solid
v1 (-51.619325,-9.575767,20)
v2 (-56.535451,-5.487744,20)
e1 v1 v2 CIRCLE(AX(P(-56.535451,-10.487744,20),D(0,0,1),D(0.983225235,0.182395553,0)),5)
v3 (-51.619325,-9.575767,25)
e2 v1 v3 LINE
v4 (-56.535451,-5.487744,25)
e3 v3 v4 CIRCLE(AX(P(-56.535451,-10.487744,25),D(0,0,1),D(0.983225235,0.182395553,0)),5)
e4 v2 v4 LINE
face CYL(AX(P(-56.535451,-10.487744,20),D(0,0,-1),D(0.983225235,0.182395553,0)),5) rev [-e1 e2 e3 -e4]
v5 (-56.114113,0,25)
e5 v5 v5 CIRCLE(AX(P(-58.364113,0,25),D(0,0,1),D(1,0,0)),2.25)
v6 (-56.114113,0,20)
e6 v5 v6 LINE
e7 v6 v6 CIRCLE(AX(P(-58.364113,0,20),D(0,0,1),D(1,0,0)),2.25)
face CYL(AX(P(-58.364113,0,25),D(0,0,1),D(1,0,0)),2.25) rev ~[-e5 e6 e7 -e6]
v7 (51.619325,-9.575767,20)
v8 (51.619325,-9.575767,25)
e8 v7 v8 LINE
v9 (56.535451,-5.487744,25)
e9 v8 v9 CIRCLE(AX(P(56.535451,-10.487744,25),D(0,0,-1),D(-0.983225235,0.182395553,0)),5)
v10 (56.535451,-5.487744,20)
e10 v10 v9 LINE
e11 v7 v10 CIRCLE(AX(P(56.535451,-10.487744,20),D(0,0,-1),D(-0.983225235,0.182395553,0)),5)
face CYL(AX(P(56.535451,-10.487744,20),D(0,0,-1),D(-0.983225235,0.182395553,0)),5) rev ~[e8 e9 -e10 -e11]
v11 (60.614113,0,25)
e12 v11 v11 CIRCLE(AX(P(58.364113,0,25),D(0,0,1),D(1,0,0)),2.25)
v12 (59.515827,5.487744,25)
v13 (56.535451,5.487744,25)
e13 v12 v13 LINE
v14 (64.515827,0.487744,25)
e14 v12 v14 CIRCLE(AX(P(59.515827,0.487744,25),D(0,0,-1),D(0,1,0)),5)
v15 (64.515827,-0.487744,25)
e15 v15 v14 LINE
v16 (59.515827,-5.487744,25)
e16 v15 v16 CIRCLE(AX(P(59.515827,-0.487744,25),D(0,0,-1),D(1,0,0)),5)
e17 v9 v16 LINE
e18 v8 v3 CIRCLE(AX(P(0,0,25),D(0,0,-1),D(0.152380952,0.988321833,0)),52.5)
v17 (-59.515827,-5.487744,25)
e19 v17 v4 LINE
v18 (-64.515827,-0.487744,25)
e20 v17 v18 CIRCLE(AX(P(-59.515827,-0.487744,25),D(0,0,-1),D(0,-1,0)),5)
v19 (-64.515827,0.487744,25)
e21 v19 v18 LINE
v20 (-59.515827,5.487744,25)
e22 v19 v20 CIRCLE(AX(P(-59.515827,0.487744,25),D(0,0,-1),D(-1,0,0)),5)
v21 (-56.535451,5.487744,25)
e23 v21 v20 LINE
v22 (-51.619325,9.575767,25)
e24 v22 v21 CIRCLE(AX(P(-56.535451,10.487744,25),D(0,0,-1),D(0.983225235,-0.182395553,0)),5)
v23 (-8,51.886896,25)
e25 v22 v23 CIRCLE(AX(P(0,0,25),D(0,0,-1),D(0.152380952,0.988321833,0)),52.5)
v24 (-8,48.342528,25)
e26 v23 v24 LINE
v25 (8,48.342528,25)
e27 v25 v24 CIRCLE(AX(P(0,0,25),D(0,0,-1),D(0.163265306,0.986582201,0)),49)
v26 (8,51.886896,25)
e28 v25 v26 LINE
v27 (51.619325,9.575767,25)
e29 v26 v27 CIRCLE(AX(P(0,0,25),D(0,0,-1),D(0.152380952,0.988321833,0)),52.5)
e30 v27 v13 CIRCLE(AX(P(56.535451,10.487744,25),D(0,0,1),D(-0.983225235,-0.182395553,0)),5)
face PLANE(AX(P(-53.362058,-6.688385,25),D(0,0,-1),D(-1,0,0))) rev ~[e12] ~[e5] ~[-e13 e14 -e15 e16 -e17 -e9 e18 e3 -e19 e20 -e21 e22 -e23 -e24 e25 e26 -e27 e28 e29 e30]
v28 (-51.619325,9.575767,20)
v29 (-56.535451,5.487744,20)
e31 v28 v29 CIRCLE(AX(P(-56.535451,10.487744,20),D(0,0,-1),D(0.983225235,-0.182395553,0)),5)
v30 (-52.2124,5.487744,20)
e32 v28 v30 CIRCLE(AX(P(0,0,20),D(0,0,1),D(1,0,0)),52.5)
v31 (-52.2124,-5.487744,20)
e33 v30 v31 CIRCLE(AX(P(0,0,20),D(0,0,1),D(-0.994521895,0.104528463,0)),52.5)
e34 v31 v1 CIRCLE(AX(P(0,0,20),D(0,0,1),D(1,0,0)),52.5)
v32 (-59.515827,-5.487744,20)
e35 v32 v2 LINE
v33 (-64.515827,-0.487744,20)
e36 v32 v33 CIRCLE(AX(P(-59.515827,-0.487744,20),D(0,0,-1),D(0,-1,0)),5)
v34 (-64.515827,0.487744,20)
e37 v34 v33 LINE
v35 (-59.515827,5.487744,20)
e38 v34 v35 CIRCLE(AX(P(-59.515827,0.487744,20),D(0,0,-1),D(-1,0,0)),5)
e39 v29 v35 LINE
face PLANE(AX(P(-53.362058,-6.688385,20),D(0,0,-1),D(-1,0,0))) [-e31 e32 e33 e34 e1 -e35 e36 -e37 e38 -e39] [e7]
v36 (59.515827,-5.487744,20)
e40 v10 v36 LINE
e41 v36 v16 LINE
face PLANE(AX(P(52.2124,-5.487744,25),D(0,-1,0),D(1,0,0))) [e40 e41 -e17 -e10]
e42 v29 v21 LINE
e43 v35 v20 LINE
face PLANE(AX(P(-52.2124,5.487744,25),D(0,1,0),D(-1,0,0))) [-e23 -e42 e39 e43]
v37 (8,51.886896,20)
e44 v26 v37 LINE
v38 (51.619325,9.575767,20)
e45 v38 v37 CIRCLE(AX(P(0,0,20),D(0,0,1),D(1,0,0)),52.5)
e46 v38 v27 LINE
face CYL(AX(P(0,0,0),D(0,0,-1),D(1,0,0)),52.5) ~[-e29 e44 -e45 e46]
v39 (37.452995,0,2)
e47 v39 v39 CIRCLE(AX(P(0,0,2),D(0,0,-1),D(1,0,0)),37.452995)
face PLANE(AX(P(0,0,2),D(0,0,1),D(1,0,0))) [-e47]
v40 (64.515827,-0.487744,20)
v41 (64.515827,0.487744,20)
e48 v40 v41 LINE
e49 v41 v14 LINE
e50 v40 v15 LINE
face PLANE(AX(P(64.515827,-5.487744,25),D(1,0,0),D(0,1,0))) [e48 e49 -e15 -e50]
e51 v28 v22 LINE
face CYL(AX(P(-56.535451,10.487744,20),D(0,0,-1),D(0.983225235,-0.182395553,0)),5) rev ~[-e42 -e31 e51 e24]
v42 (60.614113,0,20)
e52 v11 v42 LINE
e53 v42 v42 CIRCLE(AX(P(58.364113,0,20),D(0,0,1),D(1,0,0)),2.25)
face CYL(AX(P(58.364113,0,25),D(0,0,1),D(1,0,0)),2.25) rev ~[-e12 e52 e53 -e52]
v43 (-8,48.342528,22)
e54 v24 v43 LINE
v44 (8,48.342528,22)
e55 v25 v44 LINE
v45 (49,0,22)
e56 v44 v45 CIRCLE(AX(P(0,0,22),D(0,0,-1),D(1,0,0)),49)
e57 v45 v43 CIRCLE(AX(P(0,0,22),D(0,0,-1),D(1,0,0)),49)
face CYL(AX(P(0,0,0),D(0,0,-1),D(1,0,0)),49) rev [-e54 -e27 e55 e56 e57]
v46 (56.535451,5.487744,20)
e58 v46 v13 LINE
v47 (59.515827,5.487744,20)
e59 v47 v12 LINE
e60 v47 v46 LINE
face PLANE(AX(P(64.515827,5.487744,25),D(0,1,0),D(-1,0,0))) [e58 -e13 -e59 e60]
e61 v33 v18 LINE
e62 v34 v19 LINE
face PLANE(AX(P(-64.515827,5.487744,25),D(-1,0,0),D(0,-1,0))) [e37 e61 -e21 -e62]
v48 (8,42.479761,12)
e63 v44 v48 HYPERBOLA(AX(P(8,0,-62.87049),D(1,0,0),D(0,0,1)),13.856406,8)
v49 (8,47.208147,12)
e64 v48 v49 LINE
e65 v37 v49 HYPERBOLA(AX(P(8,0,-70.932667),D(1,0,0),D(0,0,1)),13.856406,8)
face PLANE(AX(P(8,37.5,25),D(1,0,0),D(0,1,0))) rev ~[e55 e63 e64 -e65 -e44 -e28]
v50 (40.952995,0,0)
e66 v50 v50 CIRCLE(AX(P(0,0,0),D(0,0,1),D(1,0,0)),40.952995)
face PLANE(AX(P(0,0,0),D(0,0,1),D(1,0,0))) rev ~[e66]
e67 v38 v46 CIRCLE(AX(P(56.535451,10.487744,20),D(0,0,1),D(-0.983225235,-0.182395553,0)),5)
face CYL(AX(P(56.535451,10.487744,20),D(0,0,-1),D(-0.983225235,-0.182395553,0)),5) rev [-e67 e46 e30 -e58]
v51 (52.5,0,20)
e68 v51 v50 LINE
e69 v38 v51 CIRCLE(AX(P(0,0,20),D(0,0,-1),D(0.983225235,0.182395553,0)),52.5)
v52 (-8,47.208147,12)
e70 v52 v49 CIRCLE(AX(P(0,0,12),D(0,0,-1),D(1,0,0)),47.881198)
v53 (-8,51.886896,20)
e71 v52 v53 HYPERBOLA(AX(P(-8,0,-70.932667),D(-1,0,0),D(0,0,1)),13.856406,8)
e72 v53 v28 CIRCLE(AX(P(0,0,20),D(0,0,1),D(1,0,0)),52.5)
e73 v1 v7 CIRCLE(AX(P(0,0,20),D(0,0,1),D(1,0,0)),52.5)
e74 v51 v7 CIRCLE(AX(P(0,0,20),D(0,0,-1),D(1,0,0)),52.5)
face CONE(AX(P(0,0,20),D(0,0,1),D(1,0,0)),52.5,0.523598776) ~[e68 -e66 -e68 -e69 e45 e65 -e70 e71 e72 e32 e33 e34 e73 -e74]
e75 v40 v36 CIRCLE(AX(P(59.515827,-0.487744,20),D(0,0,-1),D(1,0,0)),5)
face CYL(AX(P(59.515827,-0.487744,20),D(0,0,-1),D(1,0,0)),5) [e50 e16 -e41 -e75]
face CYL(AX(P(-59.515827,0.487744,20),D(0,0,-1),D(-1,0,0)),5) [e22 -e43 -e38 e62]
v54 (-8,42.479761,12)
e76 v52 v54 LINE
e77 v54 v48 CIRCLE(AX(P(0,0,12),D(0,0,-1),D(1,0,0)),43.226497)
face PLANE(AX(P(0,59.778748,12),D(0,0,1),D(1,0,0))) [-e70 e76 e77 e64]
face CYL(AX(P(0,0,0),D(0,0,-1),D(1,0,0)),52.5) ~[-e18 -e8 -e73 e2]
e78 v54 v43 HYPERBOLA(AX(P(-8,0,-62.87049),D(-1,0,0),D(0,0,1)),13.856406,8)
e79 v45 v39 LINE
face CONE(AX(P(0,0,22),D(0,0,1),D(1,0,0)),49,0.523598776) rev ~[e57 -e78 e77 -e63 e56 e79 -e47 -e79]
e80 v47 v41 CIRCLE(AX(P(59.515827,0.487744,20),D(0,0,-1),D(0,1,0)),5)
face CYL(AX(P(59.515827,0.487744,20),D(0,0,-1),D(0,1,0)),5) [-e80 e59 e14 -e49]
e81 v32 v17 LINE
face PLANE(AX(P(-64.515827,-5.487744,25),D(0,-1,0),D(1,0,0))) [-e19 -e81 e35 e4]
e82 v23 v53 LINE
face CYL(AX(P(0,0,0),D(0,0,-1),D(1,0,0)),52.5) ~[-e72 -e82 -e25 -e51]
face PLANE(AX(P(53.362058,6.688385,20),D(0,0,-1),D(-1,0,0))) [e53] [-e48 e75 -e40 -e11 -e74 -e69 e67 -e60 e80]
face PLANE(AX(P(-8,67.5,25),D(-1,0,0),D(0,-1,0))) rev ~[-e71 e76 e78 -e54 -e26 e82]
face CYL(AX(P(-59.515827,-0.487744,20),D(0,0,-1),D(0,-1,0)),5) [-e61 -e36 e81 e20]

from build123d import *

# Parameters (mm, degrees)
F0_R        = 52.5
F0_R_2      = 49
F1_DEPTH    = 2
F2_DEPTH    = 25
F3_SIZE2    = 11.5470053838
F3_SIZE     = 20
F4_SIZE2    = 11.5470053838
F4_SIZE     = 20
F6_DEPTH    = 13
F7_R        = 2.25
F8_DEPTH    = 5
F9_T1_DEPTH = 5
F9_T3_DEPTH = 5


# Not quite as in the source:
# - a fillet or chamfer that OpenCascade refuses, or shapes differently, is made with other operations: its cross-section is extruded or revolved along the edge and cut away or added


with BuildPart() as f1:
    # F0 (on Top) → F1 (new body)
    with BuildSketch(Plane.XY):
        Circle(F0_R)
        Circle(F0_R_2, mode=Mode.SUBTRACT)
        Circle(F0_R_2)
    extrude(amount=F1_DEPTH)

    # F0 (on Top) → F2 (join)
    with BuildSketch(Plane.XY):
        Circle(F0_R)
        Circle(F0_R_2, mode=Mode.SUBTRACT)
    extrude(amount=F2_DEPTH)

    # F3
    f3_edges = [f1.edges().sort_by_distance(p)[0] for p in [
        (-49, 0, 2),
    ]]
    chamfer(f3_edges, length=F3_SIZE, length2=F3_SIZE2)

    # F4
    f4_edges = [f1.edges().sort_by_distance(p)[0] for p in [
        (-52.5, 0, 0),
    ]]
    f4_side = f1.faces().sort_by_distance((-52.5, 0, 12.5))[0]
    chamfer(f4_edges, length=F4_SIZE, length2=F4_SIZE2, reference=f4_side)

    # F5 (on face) → F6 (cut)
    with BuildSketch(Plane.XY.offset(25)):
        with BuildLine():
            Line((8, 51.8868962263), (8, 67.5))
            Line((8, 67.5), (-8, 67.5))
            Line((-8, 67.5), (-8, 51.8868962263))
            ThreePointArc((-8, 51.8868962263), (0, 52.5), (8, 51.8868962263))
        make_face()
        with BuildLine():
            Line((8, 48.3425278611), (8, 51.8868962263))
            ThreePointArc((8, 51.8868962263), (0, 52.5), (-8, 51.8868962263))
            Line((-8, 51.8868962263), (-8, 48.3425278611))
            ThreePointArc((-8, 48.3425278611), (0, 49), (8, 48.3425278611))
        make_face()
        with BuildLine():
            Line((8, 37.5), (8, 48.3425278611))
            ThreePointArc((8, 48.3425278611), (0, 49), (-8, 48.3425278611))
            Line((-8, 48.3425278611), (-8, 37.5))
            Line((-8, 37.5), (8, 37.5))
        make_face()
    extrude(amount=-F6_DEPTH, mode=Mode.SUBTRACT)

    # F7 (on face) → F8 (join)
    with BuildSketch(Plane.XY.offset(25)):
        with BuildLine():
            Line((-64.5158270159, -5.4877443216), (-52.2123995068, -5.4877443216))
            ThreePointArc((-52.2123995068, -5.4877443216), (-52.5, 0), (-52.2123995068, 5.4877443216))
            Line((-52.2123995068, 5.4877443216), (-64.5158270159, 5.4877443216))
            Line((-64.5158270159, 5.4877443216), (-64.5158270159, -5.4877443216))
        make_face()
        with Locations((-58.3641132614, 0)):
            Circle(F7_R, mode=Mode.SUBTRACT)
        with BuildLine():
            ThreePointArc((52.2123995068, 5.4877443216), (52.5, 0), (52.2123995068, -5.4877443216))
            Line((52.2123995068, -5.4877443216), (64.5158270159, -5.4877443216))
            Line((64.5158270159, -5.4877443216), (64.5158270159, 5.4877443216))
            Line((64.5158270159, 5.4877443216), (52.2123995068, 5.4877443216))
        make_face()
        with Locations((58.3641132614, 0)):
            Circle(F7_R, mode=Mode.SUBTRACT)
    extrude(amount=-F8_DEPTH)

    # F9: fillet of radius 5 on 8 edges, made by hand

    # F9_s2 → F9_t1 (join)
    with BuildSketch(Plane.XY.offset(20)):
        with BuildLine():
            ThreePointArc((-51.6193248202, -9.5757665545), (-53.3385688277, -6.6432749931), (-56.5354509936, -5.4877443216))
            Line((-56.5354509936, -5.4877443216), (-56.5354509936, -5.3877443216))
            Line((-56.5354509936, -5.3877443216), (-52.2123995068, -5.3877443216))
            Line((-52.2123995068, -5.3877443216), (-52.1129473173, -5.4772914752))
            ThreePointArc((-52.1129473173, -5.4772914752), (-51.8571206165, -7.5232334382), (-51.5210022967, -9.5575269991))
            Line((-51.5210022967, -9.5575269991), (-51.6193248202, -9.5757665545))
        make_face()
        with BuildLine():
            ThreePointArc((-51.6193248202, 9.5757665545), (-53.3385688277, 6.6432749931), (-56.5354509936, 5.4877443216))
            Line((-56.5354509936, 5.4877443216), (-56.5354509936, 5.3877443216))
            Line((-56.5354509936, 5.3877443216), (-52.2123995068, 5.3877443216))
            Line((-52.2123995068, 5.3877443216), (-52.1129473173, 5.4772914752))
            ThreePointArc((-52.1129473173, 5.4772914752), (-51.8571206165, 7.5232334382), (-51.5210022967, 9.5575269991))
            Line((-51.5210022967, 9.5575269991), (-51.6193248202, 9.5757665545))
        make_face()
        with BuildLine():
            ThreePointArc((51.6193248202, -9.5757665545), (53.3385688277, -6.6432749931), (56.5354509936, -5.4877443216))
            Line((56.5354509936, -5.4877443216), (56.5354509936, -5.3877443216))
            Line((56.5354509936, -5.3877443216), (52.2123995068, -5.3877443216))
            Line((52.2123995068, -5.3877443216), (52.1129473173, -5.4772914752))
            ThreePointArc((52.1129473173, -5.4772914752), (51.8571206165, -7.5232334382), (51.5210022967, -9.5575269991))
            Line((51.5210022967, -9.5575269991), (51.6193248202, -9.5757665545))
        make_face()
        with BuildLine():
            ThreePointArc((51.6193248202, 9.5757665545), (53.3385688277, 6.6432749931), (56.5354509936, 5.4877443216))
            Line((56.5354509936, 5.4877443216), (56.5354509936, 5.3877443216))
            Line((56.5354509936, 5.3877443216), (52.2123995068, 5.3877443216))
            Line((52.2123995068, 5.3877443216), (52.1129473173, 5.4772914752))
            ThreePointArc((52.1129473173, 5.4772914752), (51.8571206165, 7.5232334382), (51.5210022967, 9.5575269991))
            Line((51.5210022967, 9.5575269991), (51.6193248202, 9.5757665545))
        make_face()
    extrude(amount=F9_T1_DEPTH)

    # F9_s4 → F9_t3 (cut)
    with BuildSketch(Plane.XY.offset(20)):
        with BuildLine():
            ThreePointArc((-59.5158270159, -5.4877443216), (-63.0513609218, -4.0232782275), (-64.5158270159, -0.4877443216))
            Line((-64.5158270159, -0.4877443216), (-64.6158270159, -0.4877443216))
            Line((-64.6158270159, -0.4877443216), (-64.6158270159, -5.5877443216))
            Line((-64.6158270159, -5.5877443216), (-59.5158270159, -5.5877443216))
            Line((-59.5158270159, -5.5877443216), (-59.5158270159, -5.4877443216))
        make_face()
        with BuildLine():
            ThreePointArc((-64.5158270159, 0.4877443216), (-63.0513609218, 4.0232782275), (-59.5158270159, 5.4877443216))
            Line((-59.5158270159, 5.4877443216), (-59.5158270159, 5.5877443216))
            Line((-59.5158270159, 5.5877443216), (-64.6158270159, 5.5877443216))
            Line((-64.6158270159, 5.5877443216), (-64.6158270159, 0.4877443216))
            Line((-64.6158270159, 0.4877443216), (-64.5158270159, 0.4877443216))
        make_face()
        with BuildLine():
            ThreePointArc((64.5158270159, -0.4877443216), (63.0513609218, -4.0232782275), (59.5158270159, -5.4877443216))
            Line((59.5158270159, -5.4877443216), (59.5158270159, -5.5877443216))
            Line((59.5158270159, -5.5877443216), (64.6158270159, -5.5877443216))
            Line((64.6158270159, -5.5877443216), (64.6158270159, -0.4877443216))
            Line((64.6158270159, -0.4877443216), (64.5158270159, -0.4877443216))
        make_face()
        with BuildLine():
            ThreePointArc((59.5158270159, 5.4877443216), (63.0513609218, 4.0232782275), (64.5158270159, 0.4877443216))
            Line((64.5158270159, 0.4877443216), (64.6158270159, 0.4877443216))
            Line((64.6158270159, 0.4877443216), (64.6158270159, 5.5877443216))
            Line((64.6158270159, 5.5877443216), (59.5158270159, 5.5877443216))
            Line((59.5158270159, 5.5877443216), (59.5158270159, 5.4877443216))
        make_face()
    extrude(amount=F9_T3_DEPTH, mode=Mode.SUBTRACT)


solid = f1.part
